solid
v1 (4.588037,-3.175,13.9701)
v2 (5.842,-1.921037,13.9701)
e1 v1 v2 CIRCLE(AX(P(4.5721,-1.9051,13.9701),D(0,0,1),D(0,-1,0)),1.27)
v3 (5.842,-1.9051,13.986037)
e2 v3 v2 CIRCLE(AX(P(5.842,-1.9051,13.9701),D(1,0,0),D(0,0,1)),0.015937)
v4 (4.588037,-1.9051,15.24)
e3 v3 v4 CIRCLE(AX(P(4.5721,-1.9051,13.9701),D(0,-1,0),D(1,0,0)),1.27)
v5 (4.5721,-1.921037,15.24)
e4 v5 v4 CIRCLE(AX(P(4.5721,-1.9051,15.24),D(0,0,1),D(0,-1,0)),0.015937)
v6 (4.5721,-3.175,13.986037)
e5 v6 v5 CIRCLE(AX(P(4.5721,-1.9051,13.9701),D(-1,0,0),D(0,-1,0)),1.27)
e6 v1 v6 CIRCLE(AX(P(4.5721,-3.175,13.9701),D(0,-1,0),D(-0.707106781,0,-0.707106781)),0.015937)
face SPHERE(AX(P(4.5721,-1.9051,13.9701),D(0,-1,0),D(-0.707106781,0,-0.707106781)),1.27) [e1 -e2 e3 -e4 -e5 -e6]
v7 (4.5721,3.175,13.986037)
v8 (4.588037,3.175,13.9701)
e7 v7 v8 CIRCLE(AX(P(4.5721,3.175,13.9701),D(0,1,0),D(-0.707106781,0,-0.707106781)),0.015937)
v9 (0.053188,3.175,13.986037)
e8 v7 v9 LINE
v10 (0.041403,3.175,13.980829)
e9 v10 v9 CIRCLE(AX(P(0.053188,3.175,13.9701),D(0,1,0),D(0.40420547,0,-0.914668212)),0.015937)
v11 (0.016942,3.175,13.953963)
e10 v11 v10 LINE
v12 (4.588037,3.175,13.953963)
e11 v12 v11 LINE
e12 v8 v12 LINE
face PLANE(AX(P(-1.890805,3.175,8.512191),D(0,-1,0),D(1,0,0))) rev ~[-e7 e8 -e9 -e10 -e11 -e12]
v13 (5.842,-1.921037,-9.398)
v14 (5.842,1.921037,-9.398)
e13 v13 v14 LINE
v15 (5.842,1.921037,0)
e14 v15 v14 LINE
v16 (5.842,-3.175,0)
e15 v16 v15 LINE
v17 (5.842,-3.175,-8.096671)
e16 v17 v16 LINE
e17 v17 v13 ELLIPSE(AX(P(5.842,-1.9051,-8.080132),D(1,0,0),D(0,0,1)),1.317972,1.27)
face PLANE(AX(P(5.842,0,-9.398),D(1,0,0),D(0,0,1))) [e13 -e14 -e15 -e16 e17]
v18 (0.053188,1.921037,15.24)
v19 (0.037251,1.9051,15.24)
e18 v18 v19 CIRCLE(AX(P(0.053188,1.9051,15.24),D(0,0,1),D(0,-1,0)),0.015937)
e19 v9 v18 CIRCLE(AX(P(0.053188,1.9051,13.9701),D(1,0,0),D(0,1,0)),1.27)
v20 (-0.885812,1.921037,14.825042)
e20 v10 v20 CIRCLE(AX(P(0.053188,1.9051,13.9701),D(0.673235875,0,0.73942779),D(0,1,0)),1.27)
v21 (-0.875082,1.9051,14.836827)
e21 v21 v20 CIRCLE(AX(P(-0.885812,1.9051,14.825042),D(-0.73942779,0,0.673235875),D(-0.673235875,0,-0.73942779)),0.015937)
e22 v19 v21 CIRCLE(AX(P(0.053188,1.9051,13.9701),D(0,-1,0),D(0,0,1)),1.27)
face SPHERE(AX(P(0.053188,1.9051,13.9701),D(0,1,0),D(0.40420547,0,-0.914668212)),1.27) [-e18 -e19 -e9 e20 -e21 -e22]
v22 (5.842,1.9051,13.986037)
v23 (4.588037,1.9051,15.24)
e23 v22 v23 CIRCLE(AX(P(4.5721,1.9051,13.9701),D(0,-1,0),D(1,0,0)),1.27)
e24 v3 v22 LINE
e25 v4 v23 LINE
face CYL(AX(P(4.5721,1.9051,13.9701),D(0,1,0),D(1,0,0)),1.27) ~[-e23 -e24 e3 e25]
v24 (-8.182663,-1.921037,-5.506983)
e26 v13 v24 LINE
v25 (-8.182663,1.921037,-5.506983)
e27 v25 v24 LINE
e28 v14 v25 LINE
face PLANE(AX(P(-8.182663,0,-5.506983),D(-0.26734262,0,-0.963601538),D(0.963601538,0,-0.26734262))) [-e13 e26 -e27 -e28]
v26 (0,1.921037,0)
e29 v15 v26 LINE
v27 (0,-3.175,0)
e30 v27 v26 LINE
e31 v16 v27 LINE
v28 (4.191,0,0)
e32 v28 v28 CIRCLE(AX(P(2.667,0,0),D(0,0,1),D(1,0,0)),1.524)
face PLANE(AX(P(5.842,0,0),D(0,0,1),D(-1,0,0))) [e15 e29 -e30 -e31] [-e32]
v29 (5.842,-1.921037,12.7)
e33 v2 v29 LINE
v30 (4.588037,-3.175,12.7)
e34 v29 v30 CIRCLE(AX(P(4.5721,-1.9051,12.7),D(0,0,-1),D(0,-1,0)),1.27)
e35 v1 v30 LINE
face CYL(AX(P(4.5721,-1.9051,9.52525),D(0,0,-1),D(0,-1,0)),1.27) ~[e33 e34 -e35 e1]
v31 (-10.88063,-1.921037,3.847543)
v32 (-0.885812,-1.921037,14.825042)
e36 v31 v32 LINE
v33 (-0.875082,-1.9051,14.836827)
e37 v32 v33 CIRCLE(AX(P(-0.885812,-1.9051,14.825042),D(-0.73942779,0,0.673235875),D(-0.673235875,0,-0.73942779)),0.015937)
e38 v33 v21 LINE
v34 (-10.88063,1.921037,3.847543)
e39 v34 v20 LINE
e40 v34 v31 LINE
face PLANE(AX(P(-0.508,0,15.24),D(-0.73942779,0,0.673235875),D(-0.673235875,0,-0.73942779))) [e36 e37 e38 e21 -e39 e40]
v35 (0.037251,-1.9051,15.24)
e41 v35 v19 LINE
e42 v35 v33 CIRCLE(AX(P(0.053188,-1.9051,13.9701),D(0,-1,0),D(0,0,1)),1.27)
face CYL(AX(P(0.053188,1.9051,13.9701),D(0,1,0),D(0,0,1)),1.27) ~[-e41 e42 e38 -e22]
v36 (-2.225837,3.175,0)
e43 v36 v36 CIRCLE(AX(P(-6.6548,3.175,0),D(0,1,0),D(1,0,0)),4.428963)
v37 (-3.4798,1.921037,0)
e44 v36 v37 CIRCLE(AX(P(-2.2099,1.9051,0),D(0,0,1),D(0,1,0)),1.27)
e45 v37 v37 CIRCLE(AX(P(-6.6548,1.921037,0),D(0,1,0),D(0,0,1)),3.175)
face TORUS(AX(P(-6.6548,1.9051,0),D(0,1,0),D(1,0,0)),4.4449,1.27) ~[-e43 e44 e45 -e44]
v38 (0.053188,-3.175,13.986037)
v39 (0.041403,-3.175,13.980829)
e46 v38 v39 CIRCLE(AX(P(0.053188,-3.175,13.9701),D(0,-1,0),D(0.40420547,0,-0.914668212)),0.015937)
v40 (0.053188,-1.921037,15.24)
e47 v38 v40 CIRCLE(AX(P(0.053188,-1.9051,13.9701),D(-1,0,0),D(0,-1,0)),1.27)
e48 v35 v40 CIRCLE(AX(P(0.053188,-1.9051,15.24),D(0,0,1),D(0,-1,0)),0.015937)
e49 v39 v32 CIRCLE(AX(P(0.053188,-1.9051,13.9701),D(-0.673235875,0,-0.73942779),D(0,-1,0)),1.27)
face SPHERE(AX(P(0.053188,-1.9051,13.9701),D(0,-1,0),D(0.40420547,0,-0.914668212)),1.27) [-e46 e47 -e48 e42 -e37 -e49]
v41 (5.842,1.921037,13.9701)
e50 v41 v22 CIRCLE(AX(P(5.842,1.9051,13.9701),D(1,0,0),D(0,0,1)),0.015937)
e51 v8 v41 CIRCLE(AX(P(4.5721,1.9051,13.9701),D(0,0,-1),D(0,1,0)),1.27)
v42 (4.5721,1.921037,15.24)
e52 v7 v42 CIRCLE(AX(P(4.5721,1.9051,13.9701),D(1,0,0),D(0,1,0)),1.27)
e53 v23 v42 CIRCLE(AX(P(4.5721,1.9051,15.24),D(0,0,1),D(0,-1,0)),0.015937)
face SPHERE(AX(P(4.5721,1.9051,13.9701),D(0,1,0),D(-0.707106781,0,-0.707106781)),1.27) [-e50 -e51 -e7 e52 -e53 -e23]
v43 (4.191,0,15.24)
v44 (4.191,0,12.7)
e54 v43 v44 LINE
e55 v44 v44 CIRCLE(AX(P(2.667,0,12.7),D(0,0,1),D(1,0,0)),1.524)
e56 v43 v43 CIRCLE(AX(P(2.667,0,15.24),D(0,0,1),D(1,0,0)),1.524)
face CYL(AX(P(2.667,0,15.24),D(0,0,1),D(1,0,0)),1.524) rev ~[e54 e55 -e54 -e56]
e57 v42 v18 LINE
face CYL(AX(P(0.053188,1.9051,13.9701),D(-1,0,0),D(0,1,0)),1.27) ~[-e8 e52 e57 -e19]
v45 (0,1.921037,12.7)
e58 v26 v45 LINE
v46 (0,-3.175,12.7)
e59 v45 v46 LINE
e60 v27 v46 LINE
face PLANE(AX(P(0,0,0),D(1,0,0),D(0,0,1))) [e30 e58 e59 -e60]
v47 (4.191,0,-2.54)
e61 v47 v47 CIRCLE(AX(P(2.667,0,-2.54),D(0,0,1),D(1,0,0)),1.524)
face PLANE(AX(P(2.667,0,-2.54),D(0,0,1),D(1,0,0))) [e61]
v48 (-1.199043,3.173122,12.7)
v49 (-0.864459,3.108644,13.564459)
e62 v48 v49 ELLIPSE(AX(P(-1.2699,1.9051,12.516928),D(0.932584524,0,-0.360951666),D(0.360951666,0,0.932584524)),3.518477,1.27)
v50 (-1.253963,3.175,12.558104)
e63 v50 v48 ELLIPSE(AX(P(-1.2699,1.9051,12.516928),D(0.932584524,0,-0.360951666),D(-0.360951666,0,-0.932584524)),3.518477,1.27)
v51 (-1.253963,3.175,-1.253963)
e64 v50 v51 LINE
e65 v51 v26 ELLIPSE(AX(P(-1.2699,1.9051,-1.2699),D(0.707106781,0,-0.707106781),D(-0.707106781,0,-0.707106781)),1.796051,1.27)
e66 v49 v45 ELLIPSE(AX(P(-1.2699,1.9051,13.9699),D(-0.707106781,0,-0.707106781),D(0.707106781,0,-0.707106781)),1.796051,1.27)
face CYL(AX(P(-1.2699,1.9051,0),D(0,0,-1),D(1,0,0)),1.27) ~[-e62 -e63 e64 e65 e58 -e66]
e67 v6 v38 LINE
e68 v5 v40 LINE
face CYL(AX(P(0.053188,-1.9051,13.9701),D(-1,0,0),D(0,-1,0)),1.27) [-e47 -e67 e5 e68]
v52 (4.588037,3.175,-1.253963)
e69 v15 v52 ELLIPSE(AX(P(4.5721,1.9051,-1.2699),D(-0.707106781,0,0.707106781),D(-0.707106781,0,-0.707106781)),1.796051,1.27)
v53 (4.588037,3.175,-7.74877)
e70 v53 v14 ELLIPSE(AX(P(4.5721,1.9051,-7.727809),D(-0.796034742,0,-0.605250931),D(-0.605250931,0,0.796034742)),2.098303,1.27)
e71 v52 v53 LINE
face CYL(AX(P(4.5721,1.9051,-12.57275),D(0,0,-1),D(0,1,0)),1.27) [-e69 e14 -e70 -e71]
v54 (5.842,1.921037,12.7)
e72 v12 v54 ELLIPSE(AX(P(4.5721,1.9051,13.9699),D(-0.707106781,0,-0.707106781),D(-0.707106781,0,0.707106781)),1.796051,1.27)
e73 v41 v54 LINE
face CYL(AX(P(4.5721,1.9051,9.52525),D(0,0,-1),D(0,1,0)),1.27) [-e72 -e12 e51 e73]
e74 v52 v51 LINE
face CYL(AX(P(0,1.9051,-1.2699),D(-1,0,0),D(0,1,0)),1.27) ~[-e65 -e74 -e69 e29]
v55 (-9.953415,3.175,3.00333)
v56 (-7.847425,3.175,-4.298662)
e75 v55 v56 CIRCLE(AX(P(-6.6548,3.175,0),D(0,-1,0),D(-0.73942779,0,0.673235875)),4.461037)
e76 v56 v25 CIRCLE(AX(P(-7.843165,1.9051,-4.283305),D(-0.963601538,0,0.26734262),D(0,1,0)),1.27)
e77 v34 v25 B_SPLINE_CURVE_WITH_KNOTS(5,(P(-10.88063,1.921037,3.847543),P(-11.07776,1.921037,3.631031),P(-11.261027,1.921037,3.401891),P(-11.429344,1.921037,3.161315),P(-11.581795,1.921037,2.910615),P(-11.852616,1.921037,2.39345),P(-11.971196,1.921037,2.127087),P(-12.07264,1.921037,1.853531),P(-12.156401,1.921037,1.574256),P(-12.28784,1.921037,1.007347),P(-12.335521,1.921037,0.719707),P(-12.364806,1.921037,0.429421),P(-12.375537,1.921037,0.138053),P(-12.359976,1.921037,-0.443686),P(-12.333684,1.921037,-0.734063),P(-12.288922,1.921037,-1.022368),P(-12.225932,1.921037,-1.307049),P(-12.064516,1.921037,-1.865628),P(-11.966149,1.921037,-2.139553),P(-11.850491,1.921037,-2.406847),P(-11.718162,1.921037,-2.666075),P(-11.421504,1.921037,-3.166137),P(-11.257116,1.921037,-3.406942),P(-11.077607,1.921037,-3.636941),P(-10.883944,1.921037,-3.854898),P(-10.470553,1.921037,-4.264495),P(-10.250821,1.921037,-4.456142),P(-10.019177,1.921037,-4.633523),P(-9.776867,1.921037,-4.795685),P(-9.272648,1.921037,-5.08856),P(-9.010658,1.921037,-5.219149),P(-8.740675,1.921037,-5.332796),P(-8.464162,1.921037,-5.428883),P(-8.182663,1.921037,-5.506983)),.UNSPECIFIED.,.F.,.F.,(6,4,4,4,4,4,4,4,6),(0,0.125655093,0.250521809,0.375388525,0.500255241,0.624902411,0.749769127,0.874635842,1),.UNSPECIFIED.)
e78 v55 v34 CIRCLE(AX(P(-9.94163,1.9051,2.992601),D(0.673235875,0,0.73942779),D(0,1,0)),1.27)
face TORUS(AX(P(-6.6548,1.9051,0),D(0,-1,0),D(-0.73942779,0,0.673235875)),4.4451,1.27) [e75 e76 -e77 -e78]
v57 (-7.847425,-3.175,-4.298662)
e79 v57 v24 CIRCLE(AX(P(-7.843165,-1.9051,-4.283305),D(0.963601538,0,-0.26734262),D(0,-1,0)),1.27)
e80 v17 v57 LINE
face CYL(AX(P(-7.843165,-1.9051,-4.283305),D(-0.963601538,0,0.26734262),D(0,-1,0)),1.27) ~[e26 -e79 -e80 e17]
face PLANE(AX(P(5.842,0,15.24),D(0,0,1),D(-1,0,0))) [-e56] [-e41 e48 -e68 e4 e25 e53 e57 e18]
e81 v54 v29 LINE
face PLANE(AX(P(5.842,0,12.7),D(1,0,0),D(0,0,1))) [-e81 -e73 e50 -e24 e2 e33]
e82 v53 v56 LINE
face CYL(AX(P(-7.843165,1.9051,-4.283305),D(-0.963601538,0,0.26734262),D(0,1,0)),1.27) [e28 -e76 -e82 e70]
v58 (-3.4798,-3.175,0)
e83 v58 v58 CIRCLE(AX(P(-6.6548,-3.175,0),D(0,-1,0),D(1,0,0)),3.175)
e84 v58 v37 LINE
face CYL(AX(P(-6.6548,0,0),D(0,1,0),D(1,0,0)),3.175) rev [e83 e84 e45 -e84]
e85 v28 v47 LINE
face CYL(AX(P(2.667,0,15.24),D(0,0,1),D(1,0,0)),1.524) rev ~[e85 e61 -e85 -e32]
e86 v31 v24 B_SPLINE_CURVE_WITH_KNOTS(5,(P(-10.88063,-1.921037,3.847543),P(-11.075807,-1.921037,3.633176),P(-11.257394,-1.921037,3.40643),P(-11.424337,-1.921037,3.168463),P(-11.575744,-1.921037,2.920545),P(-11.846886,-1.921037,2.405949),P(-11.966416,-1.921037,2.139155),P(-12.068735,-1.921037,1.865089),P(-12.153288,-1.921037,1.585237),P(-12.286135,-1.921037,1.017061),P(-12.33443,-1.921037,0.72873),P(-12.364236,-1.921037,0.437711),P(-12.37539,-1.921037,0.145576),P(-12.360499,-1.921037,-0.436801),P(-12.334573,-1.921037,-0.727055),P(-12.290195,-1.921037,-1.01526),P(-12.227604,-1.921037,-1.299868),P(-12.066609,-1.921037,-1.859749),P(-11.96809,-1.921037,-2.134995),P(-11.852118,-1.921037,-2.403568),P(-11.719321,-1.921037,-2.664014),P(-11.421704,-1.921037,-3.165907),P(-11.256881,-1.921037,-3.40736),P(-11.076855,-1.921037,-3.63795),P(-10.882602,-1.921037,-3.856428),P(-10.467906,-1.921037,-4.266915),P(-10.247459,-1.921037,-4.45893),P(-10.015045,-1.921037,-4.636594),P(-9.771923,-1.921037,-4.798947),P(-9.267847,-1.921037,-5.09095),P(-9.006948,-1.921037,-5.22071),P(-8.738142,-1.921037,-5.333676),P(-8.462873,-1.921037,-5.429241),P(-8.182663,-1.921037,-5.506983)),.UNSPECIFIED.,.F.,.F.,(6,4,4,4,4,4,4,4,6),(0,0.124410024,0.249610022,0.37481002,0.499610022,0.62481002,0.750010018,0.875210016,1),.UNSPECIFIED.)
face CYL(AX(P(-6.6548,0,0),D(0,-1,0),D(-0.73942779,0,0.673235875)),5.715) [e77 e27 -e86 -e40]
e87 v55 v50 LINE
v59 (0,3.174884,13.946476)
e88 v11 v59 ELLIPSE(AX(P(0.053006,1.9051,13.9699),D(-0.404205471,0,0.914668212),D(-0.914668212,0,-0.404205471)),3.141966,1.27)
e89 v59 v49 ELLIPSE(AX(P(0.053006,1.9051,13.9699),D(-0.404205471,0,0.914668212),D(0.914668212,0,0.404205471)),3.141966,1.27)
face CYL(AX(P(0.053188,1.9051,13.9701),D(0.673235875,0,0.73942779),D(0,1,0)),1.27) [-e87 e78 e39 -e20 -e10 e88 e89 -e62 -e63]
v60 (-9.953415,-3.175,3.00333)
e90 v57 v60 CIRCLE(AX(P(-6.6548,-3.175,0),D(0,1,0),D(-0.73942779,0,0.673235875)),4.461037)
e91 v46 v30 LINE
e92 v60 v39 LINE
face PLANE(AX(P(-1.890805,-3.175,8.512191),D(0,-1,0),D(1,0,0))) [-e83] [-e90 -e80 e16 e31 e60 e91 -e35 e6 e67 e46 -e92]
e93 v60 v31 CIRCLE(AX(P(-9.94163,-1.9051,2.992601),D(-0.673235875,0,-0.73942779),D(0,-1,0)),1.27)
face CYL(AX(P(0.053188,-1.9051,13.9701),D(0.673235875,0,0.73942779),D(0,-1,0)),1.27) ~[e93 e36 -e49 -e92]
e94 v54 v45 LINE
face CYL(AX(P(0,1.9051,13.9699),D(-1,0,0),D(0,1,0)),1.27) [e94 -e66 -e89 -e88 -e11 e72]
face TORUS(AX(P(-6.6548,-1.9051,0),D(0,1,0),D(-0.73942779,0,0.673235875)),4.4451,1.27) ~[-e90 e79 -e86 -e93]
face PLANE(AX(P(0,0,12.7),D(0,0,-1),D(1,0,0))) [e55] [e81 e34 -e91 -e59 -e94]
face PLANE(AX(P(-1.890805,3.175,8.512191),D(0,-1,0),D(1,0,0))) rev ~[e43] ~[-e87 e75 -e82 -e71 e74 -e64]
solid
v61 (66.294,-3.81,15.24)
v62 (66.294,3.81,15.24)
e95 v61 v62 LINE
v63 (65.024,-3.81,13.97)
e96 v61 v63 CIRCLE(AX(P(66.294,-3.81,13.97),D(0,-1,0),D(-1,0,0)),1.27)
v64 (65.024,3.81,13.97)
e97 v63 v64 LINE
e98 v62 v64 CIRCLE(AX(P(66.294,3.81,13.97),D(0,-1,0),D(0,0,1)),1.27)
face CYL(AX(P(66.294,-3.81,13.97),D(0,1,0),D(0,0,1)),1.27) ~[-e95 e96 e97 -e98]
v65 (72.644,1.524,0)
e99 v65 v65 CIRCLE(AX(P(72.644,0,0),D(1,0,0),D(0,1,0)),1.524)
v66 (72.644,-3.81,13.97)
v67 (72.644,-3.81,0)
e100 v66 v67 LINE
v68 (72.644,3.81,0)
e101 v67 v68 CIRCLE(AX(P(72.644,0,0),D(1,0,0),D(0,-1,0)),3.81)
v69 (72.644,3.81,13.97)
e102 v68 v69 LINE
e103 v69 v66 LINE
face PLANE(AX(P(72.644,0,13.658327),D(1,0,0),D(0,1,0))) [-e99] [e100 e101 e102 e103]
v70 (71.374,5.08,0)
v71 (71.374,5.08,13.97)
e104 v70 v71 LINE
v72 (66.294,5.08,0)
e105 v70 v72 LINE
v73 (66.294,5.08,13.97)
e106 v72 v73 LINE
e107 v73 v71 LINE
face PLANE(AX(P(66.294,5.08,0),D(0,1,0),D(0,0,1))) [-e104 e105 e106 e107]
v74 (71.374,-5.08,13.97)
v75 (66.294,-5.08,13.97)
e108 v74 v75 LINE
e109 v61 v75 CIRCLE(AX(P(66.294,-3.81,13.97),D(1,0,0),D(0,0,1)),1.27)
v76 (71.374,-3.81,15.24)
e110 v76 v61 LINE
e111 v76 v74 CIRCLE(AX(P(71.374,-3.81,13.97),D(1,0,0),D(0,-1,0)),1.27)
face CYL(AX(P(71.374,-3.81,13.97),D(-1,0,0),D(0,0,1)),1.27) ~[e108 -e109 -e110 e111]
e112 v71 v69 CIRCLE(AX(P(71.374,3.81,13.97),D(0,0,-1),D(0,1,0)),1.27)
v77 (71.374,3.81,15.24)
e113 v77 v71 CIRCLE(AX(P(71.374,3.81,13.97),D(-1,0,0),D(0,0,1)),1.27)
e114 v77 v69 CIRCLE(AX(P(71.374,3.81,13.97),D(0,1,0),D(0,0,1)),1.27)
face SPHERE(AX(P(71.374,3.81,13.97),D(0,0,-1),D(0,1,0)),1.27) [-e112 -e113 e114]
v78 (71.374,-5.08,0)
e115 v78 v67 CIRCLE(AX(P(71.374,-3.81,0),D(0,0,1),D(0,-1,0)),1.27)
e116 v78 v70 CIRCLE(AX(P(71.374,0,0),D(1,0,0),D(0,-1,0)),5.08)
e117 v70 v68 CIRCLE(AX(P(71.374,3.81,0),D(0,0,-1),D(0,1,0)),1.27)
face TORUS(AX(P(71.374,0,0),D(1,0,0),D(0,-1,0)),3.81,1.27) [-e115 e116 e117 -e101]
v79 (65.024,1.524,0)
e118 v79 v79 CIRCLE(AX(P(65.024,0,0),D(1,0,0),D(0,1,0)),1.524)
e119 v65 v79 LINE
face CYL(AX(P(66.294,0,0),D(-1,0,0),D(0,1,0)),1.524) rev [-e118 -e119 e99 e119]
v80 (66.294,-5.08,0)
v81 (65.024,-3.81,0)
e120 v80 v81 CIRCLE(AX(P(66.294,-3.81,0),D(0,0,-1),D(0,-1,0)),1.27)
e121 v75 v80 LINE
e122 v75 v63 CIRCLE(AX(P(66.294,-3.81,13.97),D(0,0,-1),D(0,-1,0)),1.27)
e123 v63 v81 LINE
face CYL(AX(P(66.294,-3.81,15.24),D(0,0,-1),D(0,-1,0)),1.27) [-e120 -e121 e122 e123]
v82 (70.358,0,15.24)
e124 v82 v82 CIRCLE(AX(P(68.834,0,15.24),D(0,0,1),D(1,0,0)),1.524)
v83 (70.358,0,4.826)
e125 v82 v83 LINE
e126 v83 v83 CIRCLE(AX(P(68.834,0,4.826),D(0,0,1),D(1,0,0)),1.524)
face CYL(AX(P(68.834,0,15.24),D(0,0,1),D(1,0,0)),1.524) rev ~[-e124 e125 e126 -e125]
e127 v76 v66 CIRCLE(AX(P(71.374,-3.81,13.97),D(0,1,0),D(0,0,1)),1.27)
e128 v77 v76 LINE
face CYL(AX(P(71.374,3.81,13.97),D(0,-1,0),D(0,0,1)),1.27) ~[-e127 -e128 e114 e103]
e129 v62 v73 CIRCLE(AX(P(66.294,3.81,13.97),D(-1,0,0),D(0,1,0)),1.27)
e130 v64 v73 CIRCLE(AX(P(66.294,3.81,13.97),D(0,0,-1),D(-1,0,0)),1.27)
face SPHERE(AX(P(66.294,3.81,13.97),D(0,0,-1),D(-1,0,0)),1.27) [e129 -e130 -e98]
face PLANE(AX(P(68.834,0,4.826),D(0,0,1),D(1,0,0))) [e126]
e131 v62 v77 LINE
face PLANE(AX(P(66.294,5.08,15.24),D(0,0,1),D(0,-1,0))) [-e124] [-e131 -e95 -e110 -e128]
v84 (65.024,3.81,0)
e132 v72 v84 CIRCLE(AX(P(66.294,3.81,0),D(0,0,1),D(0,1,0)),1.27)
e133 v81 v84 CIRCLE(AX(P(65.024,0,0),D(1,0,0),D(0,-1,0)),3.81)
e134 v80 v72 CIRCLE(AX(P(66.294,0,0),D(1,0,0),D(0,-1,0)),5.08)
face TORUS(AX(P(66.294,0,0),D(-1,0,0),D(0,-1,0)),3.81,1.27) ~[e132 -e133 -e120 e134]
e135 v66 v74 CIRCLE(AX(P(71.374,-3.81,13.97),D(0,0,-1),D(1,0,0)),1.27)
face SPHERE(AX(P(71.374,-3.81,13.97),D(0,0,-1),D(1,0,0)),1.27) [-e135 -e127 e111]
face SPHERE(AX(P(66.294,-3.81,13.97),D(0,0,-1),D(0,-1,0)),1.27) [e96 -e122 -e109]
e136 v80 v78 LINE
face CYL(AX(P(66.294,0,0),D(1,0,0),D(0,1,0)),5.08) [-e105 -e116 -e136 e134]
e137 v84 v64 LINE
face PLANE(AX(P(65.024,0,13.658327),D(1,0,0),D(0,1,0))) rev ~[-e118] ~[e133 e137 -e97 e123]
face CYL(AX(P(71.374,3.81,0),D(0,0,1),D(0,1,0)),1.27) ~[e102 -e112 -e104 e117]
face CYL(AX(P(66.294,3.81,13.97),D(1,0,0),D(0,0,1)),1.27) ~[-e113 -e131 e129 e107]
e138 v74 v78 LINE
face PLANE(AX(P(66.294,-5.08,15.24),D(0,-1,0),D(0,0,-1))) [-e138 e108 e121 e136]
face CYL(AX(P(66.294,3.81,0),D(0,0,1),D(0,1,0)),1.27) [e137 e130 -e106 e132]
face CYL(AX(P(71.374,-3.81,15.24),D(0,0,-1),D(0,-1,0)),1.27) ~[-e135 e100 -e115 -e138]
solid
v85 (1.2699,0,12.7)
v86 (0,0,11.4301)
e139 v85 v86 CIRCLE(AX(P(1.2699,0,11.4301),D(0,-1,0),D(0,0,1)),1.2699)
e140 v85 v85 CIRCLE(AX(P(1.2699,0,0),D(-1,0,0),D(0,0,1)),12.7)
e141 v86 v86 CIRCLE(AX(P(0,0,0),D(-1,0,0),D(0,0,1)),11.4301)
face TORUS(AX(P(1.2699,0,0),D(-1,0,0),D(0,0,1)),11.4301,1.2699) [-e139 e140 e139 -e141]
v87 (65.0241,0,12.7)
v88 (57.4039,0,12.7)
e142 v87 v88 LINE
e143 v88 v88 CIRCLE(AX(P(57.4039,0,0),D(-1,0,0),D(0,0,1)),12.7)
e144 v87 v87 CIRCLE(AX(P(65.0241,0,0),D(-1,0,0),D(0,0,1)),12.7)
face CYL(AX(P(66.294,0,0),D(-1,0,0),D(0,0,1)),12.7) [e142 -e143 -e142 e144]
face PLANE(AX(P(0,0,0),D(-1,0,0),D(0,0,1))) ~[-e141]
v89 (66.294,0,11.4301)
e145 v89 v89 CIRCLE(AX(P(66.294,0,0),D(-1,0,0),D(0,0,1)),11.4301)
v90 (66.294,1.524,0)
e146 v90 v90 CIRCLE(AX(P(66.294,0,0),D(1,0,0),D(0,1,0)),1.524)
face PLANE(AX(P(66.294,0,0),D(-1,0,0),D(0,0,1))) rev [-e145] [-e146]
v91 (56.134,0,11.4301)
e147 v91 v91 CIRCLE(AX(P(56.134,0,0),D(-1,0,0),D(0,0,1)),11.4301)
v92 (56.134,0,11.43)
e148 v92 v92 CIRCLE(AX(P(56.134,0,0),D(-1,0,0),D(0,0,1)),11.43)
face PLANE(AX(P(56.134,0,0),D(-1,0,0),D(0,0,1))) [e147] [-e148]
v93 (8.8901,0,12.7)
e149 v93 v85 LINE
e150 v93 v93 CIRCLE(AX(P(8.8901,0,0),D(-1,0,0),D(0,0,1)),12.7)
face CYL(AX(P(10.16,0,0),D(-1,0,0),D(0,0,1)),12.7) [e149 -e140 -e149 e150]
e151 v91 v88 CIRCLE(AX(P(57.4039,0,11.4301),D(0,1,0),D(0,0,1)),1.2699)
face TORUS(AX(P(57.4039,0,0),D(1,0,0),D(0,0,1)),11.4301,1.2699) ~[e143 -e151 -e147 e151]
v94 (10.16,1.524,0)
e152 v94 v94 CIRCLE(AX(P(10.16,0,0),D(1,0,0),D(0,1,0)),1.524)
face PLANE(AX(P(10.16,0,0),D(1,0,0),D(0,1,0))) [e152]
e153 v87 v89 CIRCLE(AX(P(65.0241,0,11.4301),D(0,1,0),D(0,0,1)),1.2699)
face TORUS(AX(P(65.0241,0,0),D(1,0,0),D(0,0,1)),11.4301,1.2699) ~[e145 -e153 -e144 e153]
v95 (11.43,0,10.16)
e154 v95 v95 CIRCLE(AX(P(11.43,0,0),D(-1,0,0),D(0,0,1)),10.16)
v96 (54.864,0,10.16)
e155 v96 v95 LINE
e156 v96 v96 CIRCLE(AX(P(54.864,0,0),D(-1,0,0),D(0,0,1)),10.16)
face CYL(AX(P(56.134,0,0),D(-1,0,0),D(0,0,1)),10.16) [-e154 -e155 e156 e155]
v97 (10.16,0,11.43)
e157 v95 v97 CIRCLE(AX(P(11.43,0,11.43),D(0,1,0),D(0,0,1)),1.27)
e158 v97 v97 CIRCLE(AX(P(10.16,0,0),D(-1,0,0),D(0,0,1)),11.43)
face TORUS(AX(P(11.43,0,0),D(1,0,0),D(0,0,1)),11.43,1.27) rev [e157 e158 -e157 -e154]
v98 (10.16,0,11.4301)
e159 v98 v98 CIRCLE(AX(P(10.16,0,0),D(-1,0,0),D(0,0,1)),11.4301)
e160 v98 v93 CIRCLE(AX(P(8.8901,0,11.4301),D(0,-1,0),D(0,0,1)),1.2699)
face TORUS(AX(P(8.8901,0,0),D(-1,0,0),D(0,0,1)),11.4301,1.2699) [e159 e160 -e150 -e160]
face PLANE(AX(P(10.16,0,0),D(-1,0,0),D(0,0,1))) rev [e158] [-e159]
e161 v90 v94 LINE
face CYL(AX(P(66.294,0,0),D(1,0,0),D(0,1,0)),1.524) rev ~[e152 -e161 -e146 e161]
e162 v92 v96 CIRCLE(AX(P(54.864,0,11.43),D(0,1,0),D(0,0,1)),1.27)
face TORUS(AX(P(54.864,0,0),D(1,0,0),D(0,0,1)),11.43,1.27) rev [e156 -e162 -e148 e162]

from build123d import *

# Parameters (mm, degrees)
F0_W            = 5.842
F0_H            = 12.7
F0_R            = 3.175
F2_DEPTH        = 3.175
F3_R            = 1.524
F4_DEPTH        = 6.35
F4_DEPTH_BACK   = 1.27
F5_R            = 1.524
F6_DEPTH        = 56.134
F7_R            = 1.524
F8_DEPTH        = 10.414
F9_R            = 1.524
F10_DEPTH       = 17.78
F11_F1_R        = 1.27
F11_F2_R        = 1.2699
F11_2_T1_DEPTH  = 12.7
F11_2_T3_DEPTH  = 9.0167500098
F11_2_T5_DEPTH  = 4.4448500098
F11_2_T7_DEPTH  = 4.5189123252
F11_2_T9_DEPTH  = 14.8459381194
F11_2_T11_DEPTH = 17.7291716486
F11_2_T13_DEPTH = 15.7475000197
F11_2_T15_DEPTH = 3.8102
F11_2_S19_W     = 1.2954
F11_2_S19_H     = 1.2954
F11_2_T20_DEPTH = 1.2954
F11_2_T26_DEPTH = 1.2954
F11_2_S31_W     = 1.2954
F11_2_S31_H     = 1.2954
F11_2_T32_DEPTH = 1.2954
F11_2_T38_DEPTH = 1.2954
F11_2_T42_ANGLE = 116.8111069241
F11_2_T44_ANGLE = 116.8111069241
F11_2_T51_DEPTH = 15.8747500098
F11_2_T55_DEPTH = 12.1915000197
F11_2_T62_DEPTH = 15.8747500098
F11_2_T66_DEPTH = 12.1915000197
F11_3_F1_R      = 1.27
F11_3_F2_R      = 1.27
F11_3_F3_R      = 1.27


# Not quite as in the source:
# - a fillet or chamfer that OpenCascade refuses, or shapes differently, is made with other operations: its cross-section is extruded or revolved along the edge and cut away or added
# - a fillet or chamfer is up to 0.001 mm smaller than in the source, because OpenCascade refuses the exact size


with BuildPart() as f1:
    # F0 (on Front) → F1 (revolve)
    with BuildSketch(Plane.XZ):
        Polygon((5.842, 12.7), (5.842, 0), (66.294, 0), (66.294, 12.7), (56.134, 12.7), (56.134, 10.16), (10.16, 10.16), (10.16, 12.7), align=None)
        with Locations((2.921, 6.35)):
            Rectangle(F0_W, F0_H)
    revolve(axis=Axis((33.147, 0, 0), (-1, 0, 0)))

    # F5 (on face) → F6 (cut, through all)
    with BuildSketch(Plane.YZ.offset(66.294)):
        Circle(F5_R)
    extrude(amount=-F6_DEPTH, mode=Mode.SUBTRACT)

    # F11: fillet of radius 1.27 on 7 edges, made by hand

    # F11_f1
    f11_f1_edges = [f1.edges().sort_by_distance(p)[0] for p in [
        (56.134, 0, -10.16),
        (10.16, 0, -10.16),
    ]]
    fillet(f11_f1_edges, radius=F11_F1_R)

    # F11_f2 (radius 1.27 in the source; OpenCascade refuses exactly that, so slightly less here)
    f11_f2_edges = [f1.edges().sort_by_distance(p)[0] for p in [
        (56.134, 0, -12.7),
        (10.16, 0, -12.7),
        (66.294, 0, -12.7),
        (0, 0, -12.7),
    ]]
    fillet(f11_f2_edges, radius=F11_F2_R)


with BuildPart() as f2:
    # F0 (on Front) → F2 (new body, symmetric)
    with BuildSketch(Plane.XZ):
        with BuildLine():
            Line((-0.9398, 0), (0, 0))
            Line((0, 0), (0, 12.7))
            Line((0, 12.7), (5.842, 12.7))
            Line((5.842, 12.7), (5.842, 15.24))
            Line((5.842, 15.24), (-0.508, 15.24))
            Line((-0.508, 15.24), (-10.8806298187, 3.8475430269))
            ThreePointArc((-10.8806298187, 3.8475430269), (-4.5919612295, 5.3297205562), (-0.9398, 0))
        make_face()
        with BuildLine():
            ThreePointArc((-8.1826630726, -5.5069827884), (-3.1957909266, -4.5493385486), (-0.9398, 0))
            ThreePointArc((-0.9398, 0), (-4.5919612295, 5.3297205562), (-10.8806298187, 3.8475430269))
            ThreePointArc((-10.8806298187, 3.8475430269), (-12.1459778134, -1.5837270034), (-8.1826630726, -5.5069827884))
        make_face()
        with Locations((-6.6548, 0)):
            Circle(F0_R, mode=Mode.SUBTRACT)
        with BuildLine():
            Line((5.842, 0), (0, 0))
            Line((0, 0), (-0.9398, 0))
            ThreePointArc((-0.9398, 0), (-3.1957909266, -4.5493385486), (-8.1826630726, -5.5069827884))
            Line((-8.1826630726, -5.5069827884), (5.842, -9.398))
            Line((5.842, -9.398), (5.842, 0))
        make_face()
    extrude(amount=F2_DEPTH, both=True)

    # F9 (on face) → F10 (cut)
    with BuildSketch(Plane.XY.offset(15.24)):
        with Locations((2.667, 0)):
            Circle(F9_R)
    extrude(amount=-F10_DEPTH, mode=Mode.SUBTRACT)

    # F11#2: fillet of radius 1.27 on 17 edges, made by hand

    # F11_2_s2 → F11_2_t1 (cut)
    with BuildSketch(Plane.XY):
        with BuildLine():
            ThreePointArc((0.0001, 1.9051), (-0.3718743879, 2.8031256121), (-1.2699, 3.1751))
            Line((-1.2699, 3.1751), (-1.2699, 3.2005))
            ThreePointArc((-1.2699, 3.2005), (-0.63495, 3.2004), (0, 3.2004))
            Line((0, 3.2004), (0.0254, 3.175))
            ThreePointArc((0.0254, 3.175), (0.0254, 2.54005), (0.0255, 1.9051))
            Line((0.0255, 1.9051), (0.0001, 1.9051))
        make_face()
    extrude(amount=F11_2_T1_DEPTH, mode=Mode.SUBTRACT)

    # F11_2_s4 → F11_2_t3 (cut)
    with BuildSketch(Plane.YZ):
        with BuildLine():
            ThreePointArc((3.1751, 13.9699), (2.8031256121, 13.0718743879), (1.9051, 12.6999))
            Line((1.9051, 12.6999), (1.9051, 12.6745))
            ThreePointArc((1.9051, 12.6745), (2.54005, 12.6746), (3.175, 12.6746))
            Line((3.175, 12.6746), (3.2004, 12.7))
            ThreePointArc((3.2004, 12.7), (3.2004, 13.33495), (3.2005, 13.9699))
            Line((3.2005, 13.9699), (3.1751, 13.9699))
        make_face()
        with BuildLine():
            ThreePointArc((3.1751, -1.2699), (2.8031256121, -0.3718743879), (1.9051, 0.0001))
            Line((1.9051, 0.0001), (1.9051, 0.0255))
            ThreePointArc((1.9051, 0.0255), (2.54005, 0.0254), (3.175, 0.0254))
            Line((3.175, 0.0254), (3.2004, 0))
            ThreePointArc((3.2004, 0), (3.2004, -0.63495), (3.2005, -1.2699))
            Line((3.2005, -1.2699), (3.1751, -1.2699))
        make_face()
    extrude(amount=F11_2_T3_DEPTH, mode=Mode.SUBTRACT)

    # F11_2_s6 → F11_2_t5 (cut)
    with BuildSketch(Plane.XY.offset(9.5252499902)):
        with BuildLine():
            ThreePointArc((4.5721, 3.1751), (5.4701256121, 2.8031256121), (5.8421, 1.9051))
            Line((5.8421, 1.9051), (5.8675, 1.9051))
            ThreePointArc((5.8675, 1.9051), (5.8674, 2.54005), (5.8674, 3.175))
            Line((5.8674, 3.175), (5.842, 3.2004))
            ThreePointArc((5.842, 3.2004), (5.20705, 3.2004), (4.5721, 3.2005))
            Line((4.5721, 3.2005), (4.5721, 3.1751))
        make_face()
        with BuildLine():
            ThreePointArc((4.5721, -3.1751), (5.4701256121, -2.8031256121), (5.8421, -1.9051))
            Line((5.8421, -1.9051), (5.8675, -1.9051))
            ThreePointArc((5.8675, -1.9051), (5.8674, -2.54005), (5.8674, -3.175))
            Line((5.8674, -3.175), (5.842, -3.2004))
            ThreePointArc((5.842, -3.2004), (5.20705, -3.2004), (4.5721, -3.2005))
            Line((4.5721, -3.2005), (4.5721, -3.1751))
        make_face()
    extrude(amount=F11_2_T5_DEPTH, mode=Mode.SUBTRACT)

    # F11_2_s8 → F11_2_t7 (cut)
    with BuildSketch(Plane.YZ.offset(0.0531876748)):
        with BuildLine():
            ThreePointArc((3.1751, 13.9701), (2.8031256121, 14.8681256121), (1.9051, 15.2401))
            Line((1.9051, 15.2401), (1.9051, 15.2655))
            ThreePointArc((1.9051, 15.2655), (2.54005, 15.2654), (3.175, 15.2654))
            Line((3.175, 15.2654), (3.2004, 15.24))
            ThreePointArc((3.2004, 15.24), (3.2004, 14.60505), (3.2005, 13.9701))
            Line((3.2005, 13.9701), (3.1751, 13.9701))
        make_face()
        with BuildLine():
            ThreePointArc((-3.1751, 13.9701), (-2.8031256121, 14.8681256121), (-1.9051, 15.2401))
            Line((-1.9051, 15.2401), (-1.9051, 15.2655))
            ThreePointArc((-1.9051, 15.2655), (-2.54005, 15.2654), (-3.175, 15.2654))
            Line((-3.175, 15.2654), (-3.2004, 15.24))
            ThreePointArc((-3.2004, 15.24), (-3.2004, 14.60505), (-3.2005, 13.9701))
            Line((-3.2005, 13.9701), (-3.1751, 13.9701))
        make_face()
    extrude(amount=F11_2_T7_DEPTH, mode=Mode.SUBTRACT)

    # F11_2_s10 → F11_2_t9 (cut)
    with BuildSketch(Plane(origin=(6.9785530444, 0, 7.6646777801), x_dir=(0, 1, 0), z_dir=(-0.6732358752, 0, -0.7394277898))):
        with BuildLine():
            ThreePointArc((3.1751, -9.3658440555), (2.8031256121, -10.2638696676), (1.9051, -10.6358440555))
            Line((1.9051, -10.6358440555), (1.9051, -10.6612440555))
            ThreePointArc((1.9051, -10.6612440555), (2.54005, -10.6611440555), (3.175, -10.6611440555))
            Line((3.175, -10.6611440555), (3.2004, -10.6357440555))
            ThreePointArc((3.2004, -10.6357440555), (3.2004, -10.0007940555), (3.2005, -9.3658440555))
            Line((3.2005, -9.3658440555), (3.1751, -9.3658440555))
        make_face()
        with BuildLine():
            ThreePointArc((-3.1751, -9.3658440555), (-2.8031256121, -10.2638696676), (-1.9051, -10.6358440555))
            Line((-1.9051, -10.6358440555), (-1.9051, -10.6612440555))
            ThreePointArc((-1.9051, -10.6612440555), (-2.54005, -10.6611440555), (-3.175, -10.6611440555))
            Line((-3.175, -10.6611440555), (-3.2004, -10.6357440555))
            ThreePointArc((-3.2004, -10.6357440555), (-3.2004, -10.0007940555), (-3.2005, -9.3658440555))
            Line((-3.2005, -9.3658440555), (-3.1751, -9.3658440555))
        make_face()
    extrude(amount=F11_2_T9_DEPTH, mode=Mode.SUBTRACT)

    # F11_2_s12 → F11_2_t11 (cut)
    with BuildSketch(Plane(origin=(-6.179167626, 0, 1.7143547379), x_dir=(0, 1, 0), z_dir=(0.9636015378, 0, -0.2673426199))):
        with BuildLine():
            ThreePointArc((3.1751, -6.2242116667), (2.8031256121, -7.1222372788), (1.9051, -7.4942116667))
            Line((1.9051, -7.4942116667), (1.9051, -7.5196116667))
            ThreePointArc((1.9051, -7.5196116667), (2.54005, -7.5195116667), (3.175, -7.5195116667))
            Line((3.175, -7.5195116667), (3.2004, -7.4941116667))
            ThreePointArc((3.2004, -7.4941116667), (3.2004, -6.8591616667), (3.2005, -6.2242116667))
            Line((3.2005, -6.2242116667), (3.1751, -6.2242116667))
        make_face()
        with BuildLine():
            ThreePointArc((-3.1751, -6.2242116667), (-2.8031256121, -7.1222372788), (-1.9051, -7.4942116667))
            Line((-1.9051, -7.4942116667), (-1.9051, -7.5196116667))
            ThreePointArc((-1.9051, -7.5196116667), (-2.54005, -7.5195116667), (-3.175, -7.5195116667))
            Line((-3.175, -7.5195116667), (-3.2004, -7.4941116667))
            ThreePointArc((-3.2004, -7.4941116667), (-3.2004, -6.8591616667), (-3.2005, -6.2242116667))
            Line((-3.2005, -6.2242116667), (-3.1751, -6.2242116667))
        make_face()
    extrude(amount=F11_2_T11_DEPTH, mode=Mode.SUBTRACT)

    # F11_2_s14 → F11_2_t13 (cut)
    with BuildSketch(Plane.XY.offset(-12.5727500098)):
        with BuildLine():
            ThreePointArc((4.5721, 3.1751), (5.4701256121, 2.8031256121), (5.8421, 1.9051))
            Line((5.8421, 1.9051), (5.8675, 1.9051))
            ThreePointArc((5.8675, 1.9051), (5.8674, 2.54005), (5.8674, 3.175))
            Line((5.8674, 3.175), (5.842, 3.2004))
            ThreePointArc((5.842, 3.2004), (5.20705, 3.2004), (4.5721, 3.2005))
            Line((4.5721, 3.2005), (4.5721, 3.1751))
        make_face()
    extrude(amount=F11_2_T13_DEPTH, mode=Mode.SUBTRACT)

    # F11_2_s16 → F11_2_t15 (cut)
    with BuildSketch(Plane.XZ.offset(-1.9051)):
        with BuildLine():
            ThreePointArc((5.8421, 13.9701), (5.4701256121, 14.8681256121), (4.5721, 15.2401))
            Line((4.5721, 15.2401), (4.5721, 15.2655))
            ThreePointArc((4.5721, 15.2655), (5.20705, 15.2654), (5.842, 15.2654))
            Line((5.842, 15.2654), (5.8674, 15.24))
            ThreePointArc((5.8674, 15.24), (5.8674, 14.60505), (5.8675, 13.9701))
            Line((5.8675, 13.9701), (5.8421, 13.9701))
        make_face()
        with BuildLine():
            ThreePointArc((0.0531876748, 15.2401), (-0.4601532727, 15.1317286289), (-0.8858856182, 14.8251095615))
            Line((-0.8858856182, 14.8251095615), (-0.9046670841, 14.8422097528))
            ThreePointArc((-0.9046670841, 14.8422097528), (-0.7156873036, 15.0496213102), (-0.5267814659, 15.2571001912))
            Line((-0.5267814659, 15.2571001912), (-0.508, 15.2654))
            ThreePointArc((-0.508, 15.2654), (-0.2274061626, 15.2654), (0.0531876748, 15.2655))
            Line((0.0531876748, 15.2655), (0.0531876748, 15.2401))
        make_face()
    extrude(amount=F11_2_T15_DEPTH, mode=Mode.SUBTRACT)


with BuildPart() as f4:
    # F3 (on face) → F4 (new body, two sides)
    with BuildSketch(Plane.YZ.offset(66.294)) as f4_sk:
        with BuildLine():
            ThreePointArc((-5.08, 11.6397422652), (0, 12.7), (5.08, 11.6397422652))
            Line((5.08, 11.6397422652), (5.08, 15.24))
            Line((5.08, 15.24), (-5.08, 15.24))
            Line((-5.08, 15.24), (-5.08, 11.6397422652))
        make_face()
        with BuildLine():
            ThreePointArc((-5.08, 0), (0, 5.08), (5.08, 0))
            Line((5.08, 0), (5.08, 11.6397422652))
            ThreePointArc((5.08, 11.6397422652), (0, 12.7), (-5.08, 11.6397422652))
            Line((-5.08, 11.6397422652), (-5.08, 0))
        make_face()
        with BuildLine():
            ThreePointArc((-5.08, 0), (0, -5.08), (5.08, 0))
            ThreePointArc((5.08, 0), (0, 5.08), (-5.08, 0))
        make_face()
        Circle(F3_R, mode=Mode.SUBTRACT)
    extrude(amount=F4_DEPTH)
    extrude(f4_sk.sketch, amount=-F4_DEPTH_BACK)

    # F7 (on face) → F8 (cut)
    with BuildSketch(Plane.XY.offset(15.24)):
        with Locations((68.834, 0)):
            Circle(F7_R)
    extrude(amount=-F8_DEPTH, mode=Mode.SUBTRACT)

    # F11#3: fillet of radius 1.27 on 10 edges, made by hand

    # F11_3_f1
    f11_3_f1_edges = [f4.edges().sort_by_distance(p)[0] for p in [
        (72.644, 5.08, 7.62),
        (72.644, -5.08, 7.62),
        (72.644, 0, -5.08),
    ]]
    fillet(f11_3_f1_edges, radius=F11_3_F1_R)

    # F11_3_f2
    f11_3_f2_edges = [f4.edges().sort_by_distance(p)[0] for p in [
        (65.024, 5.08, 7.62),
        (65.024, -5.08, 7.62),
        (65.024, 0, -5.08),
    ]]
    fillet(f11_3_f2_edges, radius=F11_3_F2_R)

    # F11_3_f3
    f11_3_f3_edges = [f4.edges().sort_by_distance(p)[0] for p in [
        (72.644, 0, 15.24),
    ]]
    fillet(f11_3_f3_edges, radius=F11_3_F3_R)


with BuildPart() as f11_2_tool18:
    # F11_2_s19 → F11_2_t20 (new body)
    with BuildSketch(Plane.XZ.offset(-1.9051)):
        with Locations((5.2198, 14.6178)):
            Rectangle(F11_2_S19_W, F11_2_S19_H)
    extrude(amount=-F11_2_T20_DEPTH)

    # F11_2_s21 → F11_2_t22 (revolve, cut)
    with BuildSketch(Plane(origin=(4.5721, 1.9051, 13.9701), x_dir=(-0.7071067812, 0, -0.7071067812), z_dir=(0.7071067812, 0, -0.7071067812))):
        with BuildLine():
            ThreePointArc((0, -1.27), (1.27, 0), (0, 1.27))
            Line((0, 1.27), (0, -1.27))
        make_face()
    revolve(axis=Axis((4.5721, 1.9051, 13.9701), (0, 1, 0)), mode=Mode.SUBTRACT)


with BuildPart() as f2_1:
    add(f2.part)

    # F11_2_t17: cut F11_2_tool18
    add(f11_2_tool18.part, mode=Mode.SUBTRACT)


with BuildPart() as f11_2_tool24:
    # F11_2_s25 → F11_2_t26 (new body)
    with BuildSketch(Plane.XZ.offset(-1.9051)):
        Polygon((0.0531876748, 13.9701), (0.0531876748, 15.2655), (-0.5192688288, 15.2655), (-0.9046670841, 14.8422097528), align=None)
    extrude(amount=-F11_2_T26_DEPTH)

    # F11_2_s27 → F11_2_t28 (revolve, cut)
    with BuildSketch(Plane(origin=(0.0531876748, 1.9051, 13.9701), x_dir=(0.4042054705, 0, -0.9146682118), z_dir=(0.9146682118, 0, 0.4042054705))):
        with BuildLine():
            ThreePointArc((0, -1.27), (1.27, 0), (0, 1.27))
            Line((0, 1.27), (0, -1.27))
        make_face()
    revolve(axis=Axis((0.0531876748, 1.9051, 13.9701), (0, 1, 0)), mode=Mode.SUBTRACT)


with BuildPart() as f2_2:
    add(f2_1.part)

    # F11_2_t23: cut F11_2_tool24
    add(f11_2_tool24.part, mode=Mode.SUBTRACT)


with BuildPart() as f11_2_tool30:
    # F11_2_s31 → F11_2_t32 (new body)
    with BuildSketch(Plane.XZ.offset(1.9051)):
        with Locations((5.2198, 14.6178)):
            Rectangle(F11_2_S31_W, F11_2_S31_H)
    extrude(amount=F11_2_T32_DEPTH)

    # F11_2_s33 → F11_2_t34 (revolve, cut)
    with BuildSketch(Plane(origin=(4.5721, -1.9051, 13.9701), x_dir=(-0.7071067812, 0, -0.7071067812), z_dir=(-0.7071067812, 0, 0.7071067812))):
        with BuildLine():
            ThreePointArc((0, -1.27), (1.27, 0), (0, 1.27))
            Line((0, 1.27), (0, -1.27))
        make_face()
    revolve(axis=Axis((4.5721, -1.9051, 13.9701), (0, -1, 0)), mode=Mode.SUBTRACT)


with BuildPart() as f2_3:
    add(f2_2.part)

    # F11_2_t29: cut F11_2_tool30
    add(f11_2_tool30.part, mode=Mode.SUBTRACT)


with BuildPart() as f11_2_tool36:
    # F11_2_s37 → F11_2_t38 (new body)
    with BuildSketch(Plane.XZ.offset(1.9051)):
        Polygon((0.0531876748, 13.9701), (0.0531876748, 15.2655), (-0.5192688288, 15.2655), (-0.9046670841, 14.8422097528), align=None)
    extrude(amount=F11_2_T38_DEPTH)

    # F11_2_s39 → F11_2_t40 (revolve, cut)
    with BuildSketch(Plane(origin=(0.0531876748, -1.9051, 13.9701), x_dir=(0.4042054705, 0, -0.9146682118), z_dir=(-0.9146682118, 0, -0.4042054705))):
        with BuildLine():
            ThreePointArc((0, -1.27), (1.27, 0), (0, 1.27))
            Line((0, 1.27), (0, -1.27))
        make_face()
    revolve(axis=Axis((0.0531876748, -1.9051, 13.9701), (0, -1, 0)), mode=Mode.SUBTRACT)


with BuildPart() as f2_4:
    add(f2_3.part)

    # F11_2_t35: cut F11_2_tool36
    add(f11_2_tool36.part, mode=Mode.SUBTRACT)

    # F11_2_s41 → F11_2_t42 (revolve, cut)
    with BuildSketch(Plane(origin=(-3.0162650989, 0, -3.3128214309), x_dir=(0, 1, 0), z_dir=(0.6732358752, 0, 0.7394277898))):
        with BuildLine():
            ThreePointArc((-3.1751, 9.3658440555), (-2.8031256121, 10.2638696676), (-1.9051, 10.6358440555))
            Line((-1.9051, 10.6358440555), (-1.9051, 10.6612440555))
            ThreePointArc((-1.9051, 10.6612440555), (-2.54005, 10.6611440555), (-3.175, 10.6611440555))
            Line((-3.175, 10.6611440555), (-3.2004, 10.6357440555))
            ThreePointArc((-3.2004, 10.6357440555), (-3.2004, 10.0007940555), (-3.2005, 9.3658440555))
            Line((-3.2005, 9.3658440555), (-3.1751, 9.3658440555))
        make_face()
    revolve(axis=Axis((-6.6548, -3.175, 0), (0, -1, 0)), revolution_arc=F11_2_T42_ANGLE, mode=Mode.SUBTRACT)

    # F11_2_s43 → F11_2_t44 (revolve, cut)
    with BuildSketch(Plane(origin=(-3.0162650989, 0, -3.3128214309), x_dir=(0, 1, 0), z_dir=(0.6732358752, 0, 0.7394277898))):
        with BuildLine():
            ThreePointArc((3.1751, 9.3658440555), (2.8031256121, 10.2638696676), (1.9051, 10.6358440555))
            Line((1.9051, 10.6358440555), (1.9051, 10.6612440555))
            ThreePointArc((1.9051, 10.6612440555), (2.54005, 10.6611440555), (3.175, 10.6611440555))
            Line((3.175, 10.6611440555), (3.2004, 10.6357440555))
            ThreePointArc((3.2004, 10.6357440555), (3.2004, 10.0007940555), (3.2005, 9.3658440555))
            Line((3.2005, 9.3658440555), (3.1751, 9.3658440555))
        make_face()
    revolve(axis=Axis((-6.6548, 3.175, 0), (0, -1, 0)), revolution_arc=F11_2_T44_ANGLE, mode=Mode.SUBTRACT)

    # F11_2_s45 → F11_2_t46 (revolve, cut)
    with BuildSketch(Plane.XY):
        with BuildLine():
            ThreePointArc((-2.2099, 3.1751), (-3.1079256121, 2.8031256121), (-3.4799, 1.9051))
            Line((-3.4799, 1.9051), (-3.5053, 1.9051))
            ThreePointArc((-3.5053, 1.9051), (-3.5052, 2.54005), (-3.5052, 3.175))
            Line((-3.5052, 3.175), (-3.4798, 3.2004))
            ThreePointArc((-3.4798, 3.2004), (-2.84485, 3.2004), (-2.2099, 3.2005))
            Line((-2.2099, 3.2005), (-2.2099, 3.1751))
        make_face()
    revolve(axis=Axis((-6.6548, 3.175, 0), (0, -1, 0)), mode=Mode.SUBTRACT)


with BuildPart() as f11_2_tool49:
    # F11_2_s50 → F11_2_t51 (new body)
    with BuildSketch(Plane.XY.offset(-3.1747500098)):
        with BuildLine():
            ThreePointArc((0.0001, 1.9051), (-0.3718743879, 2.8031256121), (-1.2699, 3.1751))
            Line((-1.2699, 3.1751), (-1.2699, 3.2005))
            ThreePointArc((-1.2699, 3.2005), (-0.63495, 3.2004), (0, 3.2004))
            Line((0, 3.2004), (0.0254, 3.175))
            ThreePointArc((0.0254, 3.175), (0.0254, 2.54005), (0.0255, 1.9051))
            Line((0.0255, 1.9051), (0.0001, 1.9051))
        make_face()
    extrude(amount=F11_2_T51_DEPTH)

    split(bisect_by=Plane.XY, keep=Keep.BOTTOM)


with BuildPart() as f11_2_tool53:
    # F11_2_s54 → F11_2_t55 (new body)
    with BuildSketch(Plane.YZ.offset(9.0167500098)):
        with BuildLine():
            ThreePointArc((3.1751, -1.2699), (2.8031256121, -0.3718743879), (1.9051, 0.0001))
            Line((1.9051, 0.0001), (1.9051, 0.0255))
            ThreePointArc((1.9051, 0.0255), (2.54005, 0.0254), (3.175, 0.0254))
            Line((3.175, 0.0254), (3.2004, 0))
            ThreePointArc((3.2004, 0), (3.2004, -0.63495), (3.2005, -1.2699))
            Line((3.2005, -1.2699), (3.1751, -1.2699))
        make_face()
    extrude(amount=-F11_2_T55_DEPTH)

    split(bisect_by=Plane.YZ, keep=Keep.BOTTOM)


with BuildPart() as f11_2_tool49_1:
    add(f11_2_tool49.part)

    # F11_2_t57: intersect F11_2_tool53
    add(f11_2_tool53.part, mode=Mode.INTERSECT)


with BuildPart() as f2_5:
    add(f2_4.part)

    # F11_2_t47: cut F11_2_tool49
    add(f11_2_tool49_1.part, mode=Mode.SUBTRACT)


with BuildPart() as f11_2_tool60:
    # F11_2_s61 → F11_2_t62 (new body)
    with BuildSketch(Plane.XY):
        with BuildLine():
            ThreePointArc((0.0001, 1.9051), (-0.3718743879, 2.8031256121), (-1.2699, 3.1751))
            Line((-1.2699, 3.1751), (-1.2699, 3.2005))
            ThreePointArc((-1.2699, 3.2005), (-0.63495, 3.2004), (0, 3.2004))
            Line((0, 3.2004), (0.0254, 3.175))
            ThreePointArc((0.0254, 3.175), (0.0254, 2.54005), (0.0255, 1.9051))
            Line((0.0255, 1.9051), (0.0001, 1.9051))
        make_face()
    extrude(amount=F11_2_T62_DEPTH)

    split(bisect_by=Plane.XY.offset(12.7), keep=Keep.TOP)


with BuildPart() as f11_2_tool64:
    # F11_2_s65 → F11_2_t66 (new body)
    with BuildSketch(Plane.YZ.offset(-3.1747500098)):
        with BuildLine():
            ThreePointArc((3.1751, 13.9699), (2.8031256121, 13.0718743879), (1.9051, 12.6999))
            Line((1.9051, 12.6999), (1.9051, 12.6745))
            ThreePointArc((1.9051, 12.6745), (2.54005, 12.6746), (3.175, 12.6746))
            Line((3.175, 12.6746), (3.2004, 12.7))
            ThreePointArc((3.2004, 12.7), (3.2004, 13.33495), (3.2005, 13.9699))
            Line((3.2005, 13.9699), (3.1751, 13.9699))
        make_face()
    extrude(amount=F11_2_T66_DEPTH)

    split(bisect_by=Plane.YZ, keep=Keep.BOTTOM)


with BuildPart() as f11_2_tool60_1:
    add(f11_2_tool60.part)

    # F11_2_t68: intersect F11_2_tool64
    add(f11_2_tool64.part, mode=Mode.INTERSECT)


with BuildPart() as f2_6:
    add(f2_5.part)

    # F11_2_t58: cut F11_2_tool60
    add(f11_2_tool60_1.part, mode=Mode.SUBTRACT)


solid = Compound([f1.part, f4.part, f2_6.part])
